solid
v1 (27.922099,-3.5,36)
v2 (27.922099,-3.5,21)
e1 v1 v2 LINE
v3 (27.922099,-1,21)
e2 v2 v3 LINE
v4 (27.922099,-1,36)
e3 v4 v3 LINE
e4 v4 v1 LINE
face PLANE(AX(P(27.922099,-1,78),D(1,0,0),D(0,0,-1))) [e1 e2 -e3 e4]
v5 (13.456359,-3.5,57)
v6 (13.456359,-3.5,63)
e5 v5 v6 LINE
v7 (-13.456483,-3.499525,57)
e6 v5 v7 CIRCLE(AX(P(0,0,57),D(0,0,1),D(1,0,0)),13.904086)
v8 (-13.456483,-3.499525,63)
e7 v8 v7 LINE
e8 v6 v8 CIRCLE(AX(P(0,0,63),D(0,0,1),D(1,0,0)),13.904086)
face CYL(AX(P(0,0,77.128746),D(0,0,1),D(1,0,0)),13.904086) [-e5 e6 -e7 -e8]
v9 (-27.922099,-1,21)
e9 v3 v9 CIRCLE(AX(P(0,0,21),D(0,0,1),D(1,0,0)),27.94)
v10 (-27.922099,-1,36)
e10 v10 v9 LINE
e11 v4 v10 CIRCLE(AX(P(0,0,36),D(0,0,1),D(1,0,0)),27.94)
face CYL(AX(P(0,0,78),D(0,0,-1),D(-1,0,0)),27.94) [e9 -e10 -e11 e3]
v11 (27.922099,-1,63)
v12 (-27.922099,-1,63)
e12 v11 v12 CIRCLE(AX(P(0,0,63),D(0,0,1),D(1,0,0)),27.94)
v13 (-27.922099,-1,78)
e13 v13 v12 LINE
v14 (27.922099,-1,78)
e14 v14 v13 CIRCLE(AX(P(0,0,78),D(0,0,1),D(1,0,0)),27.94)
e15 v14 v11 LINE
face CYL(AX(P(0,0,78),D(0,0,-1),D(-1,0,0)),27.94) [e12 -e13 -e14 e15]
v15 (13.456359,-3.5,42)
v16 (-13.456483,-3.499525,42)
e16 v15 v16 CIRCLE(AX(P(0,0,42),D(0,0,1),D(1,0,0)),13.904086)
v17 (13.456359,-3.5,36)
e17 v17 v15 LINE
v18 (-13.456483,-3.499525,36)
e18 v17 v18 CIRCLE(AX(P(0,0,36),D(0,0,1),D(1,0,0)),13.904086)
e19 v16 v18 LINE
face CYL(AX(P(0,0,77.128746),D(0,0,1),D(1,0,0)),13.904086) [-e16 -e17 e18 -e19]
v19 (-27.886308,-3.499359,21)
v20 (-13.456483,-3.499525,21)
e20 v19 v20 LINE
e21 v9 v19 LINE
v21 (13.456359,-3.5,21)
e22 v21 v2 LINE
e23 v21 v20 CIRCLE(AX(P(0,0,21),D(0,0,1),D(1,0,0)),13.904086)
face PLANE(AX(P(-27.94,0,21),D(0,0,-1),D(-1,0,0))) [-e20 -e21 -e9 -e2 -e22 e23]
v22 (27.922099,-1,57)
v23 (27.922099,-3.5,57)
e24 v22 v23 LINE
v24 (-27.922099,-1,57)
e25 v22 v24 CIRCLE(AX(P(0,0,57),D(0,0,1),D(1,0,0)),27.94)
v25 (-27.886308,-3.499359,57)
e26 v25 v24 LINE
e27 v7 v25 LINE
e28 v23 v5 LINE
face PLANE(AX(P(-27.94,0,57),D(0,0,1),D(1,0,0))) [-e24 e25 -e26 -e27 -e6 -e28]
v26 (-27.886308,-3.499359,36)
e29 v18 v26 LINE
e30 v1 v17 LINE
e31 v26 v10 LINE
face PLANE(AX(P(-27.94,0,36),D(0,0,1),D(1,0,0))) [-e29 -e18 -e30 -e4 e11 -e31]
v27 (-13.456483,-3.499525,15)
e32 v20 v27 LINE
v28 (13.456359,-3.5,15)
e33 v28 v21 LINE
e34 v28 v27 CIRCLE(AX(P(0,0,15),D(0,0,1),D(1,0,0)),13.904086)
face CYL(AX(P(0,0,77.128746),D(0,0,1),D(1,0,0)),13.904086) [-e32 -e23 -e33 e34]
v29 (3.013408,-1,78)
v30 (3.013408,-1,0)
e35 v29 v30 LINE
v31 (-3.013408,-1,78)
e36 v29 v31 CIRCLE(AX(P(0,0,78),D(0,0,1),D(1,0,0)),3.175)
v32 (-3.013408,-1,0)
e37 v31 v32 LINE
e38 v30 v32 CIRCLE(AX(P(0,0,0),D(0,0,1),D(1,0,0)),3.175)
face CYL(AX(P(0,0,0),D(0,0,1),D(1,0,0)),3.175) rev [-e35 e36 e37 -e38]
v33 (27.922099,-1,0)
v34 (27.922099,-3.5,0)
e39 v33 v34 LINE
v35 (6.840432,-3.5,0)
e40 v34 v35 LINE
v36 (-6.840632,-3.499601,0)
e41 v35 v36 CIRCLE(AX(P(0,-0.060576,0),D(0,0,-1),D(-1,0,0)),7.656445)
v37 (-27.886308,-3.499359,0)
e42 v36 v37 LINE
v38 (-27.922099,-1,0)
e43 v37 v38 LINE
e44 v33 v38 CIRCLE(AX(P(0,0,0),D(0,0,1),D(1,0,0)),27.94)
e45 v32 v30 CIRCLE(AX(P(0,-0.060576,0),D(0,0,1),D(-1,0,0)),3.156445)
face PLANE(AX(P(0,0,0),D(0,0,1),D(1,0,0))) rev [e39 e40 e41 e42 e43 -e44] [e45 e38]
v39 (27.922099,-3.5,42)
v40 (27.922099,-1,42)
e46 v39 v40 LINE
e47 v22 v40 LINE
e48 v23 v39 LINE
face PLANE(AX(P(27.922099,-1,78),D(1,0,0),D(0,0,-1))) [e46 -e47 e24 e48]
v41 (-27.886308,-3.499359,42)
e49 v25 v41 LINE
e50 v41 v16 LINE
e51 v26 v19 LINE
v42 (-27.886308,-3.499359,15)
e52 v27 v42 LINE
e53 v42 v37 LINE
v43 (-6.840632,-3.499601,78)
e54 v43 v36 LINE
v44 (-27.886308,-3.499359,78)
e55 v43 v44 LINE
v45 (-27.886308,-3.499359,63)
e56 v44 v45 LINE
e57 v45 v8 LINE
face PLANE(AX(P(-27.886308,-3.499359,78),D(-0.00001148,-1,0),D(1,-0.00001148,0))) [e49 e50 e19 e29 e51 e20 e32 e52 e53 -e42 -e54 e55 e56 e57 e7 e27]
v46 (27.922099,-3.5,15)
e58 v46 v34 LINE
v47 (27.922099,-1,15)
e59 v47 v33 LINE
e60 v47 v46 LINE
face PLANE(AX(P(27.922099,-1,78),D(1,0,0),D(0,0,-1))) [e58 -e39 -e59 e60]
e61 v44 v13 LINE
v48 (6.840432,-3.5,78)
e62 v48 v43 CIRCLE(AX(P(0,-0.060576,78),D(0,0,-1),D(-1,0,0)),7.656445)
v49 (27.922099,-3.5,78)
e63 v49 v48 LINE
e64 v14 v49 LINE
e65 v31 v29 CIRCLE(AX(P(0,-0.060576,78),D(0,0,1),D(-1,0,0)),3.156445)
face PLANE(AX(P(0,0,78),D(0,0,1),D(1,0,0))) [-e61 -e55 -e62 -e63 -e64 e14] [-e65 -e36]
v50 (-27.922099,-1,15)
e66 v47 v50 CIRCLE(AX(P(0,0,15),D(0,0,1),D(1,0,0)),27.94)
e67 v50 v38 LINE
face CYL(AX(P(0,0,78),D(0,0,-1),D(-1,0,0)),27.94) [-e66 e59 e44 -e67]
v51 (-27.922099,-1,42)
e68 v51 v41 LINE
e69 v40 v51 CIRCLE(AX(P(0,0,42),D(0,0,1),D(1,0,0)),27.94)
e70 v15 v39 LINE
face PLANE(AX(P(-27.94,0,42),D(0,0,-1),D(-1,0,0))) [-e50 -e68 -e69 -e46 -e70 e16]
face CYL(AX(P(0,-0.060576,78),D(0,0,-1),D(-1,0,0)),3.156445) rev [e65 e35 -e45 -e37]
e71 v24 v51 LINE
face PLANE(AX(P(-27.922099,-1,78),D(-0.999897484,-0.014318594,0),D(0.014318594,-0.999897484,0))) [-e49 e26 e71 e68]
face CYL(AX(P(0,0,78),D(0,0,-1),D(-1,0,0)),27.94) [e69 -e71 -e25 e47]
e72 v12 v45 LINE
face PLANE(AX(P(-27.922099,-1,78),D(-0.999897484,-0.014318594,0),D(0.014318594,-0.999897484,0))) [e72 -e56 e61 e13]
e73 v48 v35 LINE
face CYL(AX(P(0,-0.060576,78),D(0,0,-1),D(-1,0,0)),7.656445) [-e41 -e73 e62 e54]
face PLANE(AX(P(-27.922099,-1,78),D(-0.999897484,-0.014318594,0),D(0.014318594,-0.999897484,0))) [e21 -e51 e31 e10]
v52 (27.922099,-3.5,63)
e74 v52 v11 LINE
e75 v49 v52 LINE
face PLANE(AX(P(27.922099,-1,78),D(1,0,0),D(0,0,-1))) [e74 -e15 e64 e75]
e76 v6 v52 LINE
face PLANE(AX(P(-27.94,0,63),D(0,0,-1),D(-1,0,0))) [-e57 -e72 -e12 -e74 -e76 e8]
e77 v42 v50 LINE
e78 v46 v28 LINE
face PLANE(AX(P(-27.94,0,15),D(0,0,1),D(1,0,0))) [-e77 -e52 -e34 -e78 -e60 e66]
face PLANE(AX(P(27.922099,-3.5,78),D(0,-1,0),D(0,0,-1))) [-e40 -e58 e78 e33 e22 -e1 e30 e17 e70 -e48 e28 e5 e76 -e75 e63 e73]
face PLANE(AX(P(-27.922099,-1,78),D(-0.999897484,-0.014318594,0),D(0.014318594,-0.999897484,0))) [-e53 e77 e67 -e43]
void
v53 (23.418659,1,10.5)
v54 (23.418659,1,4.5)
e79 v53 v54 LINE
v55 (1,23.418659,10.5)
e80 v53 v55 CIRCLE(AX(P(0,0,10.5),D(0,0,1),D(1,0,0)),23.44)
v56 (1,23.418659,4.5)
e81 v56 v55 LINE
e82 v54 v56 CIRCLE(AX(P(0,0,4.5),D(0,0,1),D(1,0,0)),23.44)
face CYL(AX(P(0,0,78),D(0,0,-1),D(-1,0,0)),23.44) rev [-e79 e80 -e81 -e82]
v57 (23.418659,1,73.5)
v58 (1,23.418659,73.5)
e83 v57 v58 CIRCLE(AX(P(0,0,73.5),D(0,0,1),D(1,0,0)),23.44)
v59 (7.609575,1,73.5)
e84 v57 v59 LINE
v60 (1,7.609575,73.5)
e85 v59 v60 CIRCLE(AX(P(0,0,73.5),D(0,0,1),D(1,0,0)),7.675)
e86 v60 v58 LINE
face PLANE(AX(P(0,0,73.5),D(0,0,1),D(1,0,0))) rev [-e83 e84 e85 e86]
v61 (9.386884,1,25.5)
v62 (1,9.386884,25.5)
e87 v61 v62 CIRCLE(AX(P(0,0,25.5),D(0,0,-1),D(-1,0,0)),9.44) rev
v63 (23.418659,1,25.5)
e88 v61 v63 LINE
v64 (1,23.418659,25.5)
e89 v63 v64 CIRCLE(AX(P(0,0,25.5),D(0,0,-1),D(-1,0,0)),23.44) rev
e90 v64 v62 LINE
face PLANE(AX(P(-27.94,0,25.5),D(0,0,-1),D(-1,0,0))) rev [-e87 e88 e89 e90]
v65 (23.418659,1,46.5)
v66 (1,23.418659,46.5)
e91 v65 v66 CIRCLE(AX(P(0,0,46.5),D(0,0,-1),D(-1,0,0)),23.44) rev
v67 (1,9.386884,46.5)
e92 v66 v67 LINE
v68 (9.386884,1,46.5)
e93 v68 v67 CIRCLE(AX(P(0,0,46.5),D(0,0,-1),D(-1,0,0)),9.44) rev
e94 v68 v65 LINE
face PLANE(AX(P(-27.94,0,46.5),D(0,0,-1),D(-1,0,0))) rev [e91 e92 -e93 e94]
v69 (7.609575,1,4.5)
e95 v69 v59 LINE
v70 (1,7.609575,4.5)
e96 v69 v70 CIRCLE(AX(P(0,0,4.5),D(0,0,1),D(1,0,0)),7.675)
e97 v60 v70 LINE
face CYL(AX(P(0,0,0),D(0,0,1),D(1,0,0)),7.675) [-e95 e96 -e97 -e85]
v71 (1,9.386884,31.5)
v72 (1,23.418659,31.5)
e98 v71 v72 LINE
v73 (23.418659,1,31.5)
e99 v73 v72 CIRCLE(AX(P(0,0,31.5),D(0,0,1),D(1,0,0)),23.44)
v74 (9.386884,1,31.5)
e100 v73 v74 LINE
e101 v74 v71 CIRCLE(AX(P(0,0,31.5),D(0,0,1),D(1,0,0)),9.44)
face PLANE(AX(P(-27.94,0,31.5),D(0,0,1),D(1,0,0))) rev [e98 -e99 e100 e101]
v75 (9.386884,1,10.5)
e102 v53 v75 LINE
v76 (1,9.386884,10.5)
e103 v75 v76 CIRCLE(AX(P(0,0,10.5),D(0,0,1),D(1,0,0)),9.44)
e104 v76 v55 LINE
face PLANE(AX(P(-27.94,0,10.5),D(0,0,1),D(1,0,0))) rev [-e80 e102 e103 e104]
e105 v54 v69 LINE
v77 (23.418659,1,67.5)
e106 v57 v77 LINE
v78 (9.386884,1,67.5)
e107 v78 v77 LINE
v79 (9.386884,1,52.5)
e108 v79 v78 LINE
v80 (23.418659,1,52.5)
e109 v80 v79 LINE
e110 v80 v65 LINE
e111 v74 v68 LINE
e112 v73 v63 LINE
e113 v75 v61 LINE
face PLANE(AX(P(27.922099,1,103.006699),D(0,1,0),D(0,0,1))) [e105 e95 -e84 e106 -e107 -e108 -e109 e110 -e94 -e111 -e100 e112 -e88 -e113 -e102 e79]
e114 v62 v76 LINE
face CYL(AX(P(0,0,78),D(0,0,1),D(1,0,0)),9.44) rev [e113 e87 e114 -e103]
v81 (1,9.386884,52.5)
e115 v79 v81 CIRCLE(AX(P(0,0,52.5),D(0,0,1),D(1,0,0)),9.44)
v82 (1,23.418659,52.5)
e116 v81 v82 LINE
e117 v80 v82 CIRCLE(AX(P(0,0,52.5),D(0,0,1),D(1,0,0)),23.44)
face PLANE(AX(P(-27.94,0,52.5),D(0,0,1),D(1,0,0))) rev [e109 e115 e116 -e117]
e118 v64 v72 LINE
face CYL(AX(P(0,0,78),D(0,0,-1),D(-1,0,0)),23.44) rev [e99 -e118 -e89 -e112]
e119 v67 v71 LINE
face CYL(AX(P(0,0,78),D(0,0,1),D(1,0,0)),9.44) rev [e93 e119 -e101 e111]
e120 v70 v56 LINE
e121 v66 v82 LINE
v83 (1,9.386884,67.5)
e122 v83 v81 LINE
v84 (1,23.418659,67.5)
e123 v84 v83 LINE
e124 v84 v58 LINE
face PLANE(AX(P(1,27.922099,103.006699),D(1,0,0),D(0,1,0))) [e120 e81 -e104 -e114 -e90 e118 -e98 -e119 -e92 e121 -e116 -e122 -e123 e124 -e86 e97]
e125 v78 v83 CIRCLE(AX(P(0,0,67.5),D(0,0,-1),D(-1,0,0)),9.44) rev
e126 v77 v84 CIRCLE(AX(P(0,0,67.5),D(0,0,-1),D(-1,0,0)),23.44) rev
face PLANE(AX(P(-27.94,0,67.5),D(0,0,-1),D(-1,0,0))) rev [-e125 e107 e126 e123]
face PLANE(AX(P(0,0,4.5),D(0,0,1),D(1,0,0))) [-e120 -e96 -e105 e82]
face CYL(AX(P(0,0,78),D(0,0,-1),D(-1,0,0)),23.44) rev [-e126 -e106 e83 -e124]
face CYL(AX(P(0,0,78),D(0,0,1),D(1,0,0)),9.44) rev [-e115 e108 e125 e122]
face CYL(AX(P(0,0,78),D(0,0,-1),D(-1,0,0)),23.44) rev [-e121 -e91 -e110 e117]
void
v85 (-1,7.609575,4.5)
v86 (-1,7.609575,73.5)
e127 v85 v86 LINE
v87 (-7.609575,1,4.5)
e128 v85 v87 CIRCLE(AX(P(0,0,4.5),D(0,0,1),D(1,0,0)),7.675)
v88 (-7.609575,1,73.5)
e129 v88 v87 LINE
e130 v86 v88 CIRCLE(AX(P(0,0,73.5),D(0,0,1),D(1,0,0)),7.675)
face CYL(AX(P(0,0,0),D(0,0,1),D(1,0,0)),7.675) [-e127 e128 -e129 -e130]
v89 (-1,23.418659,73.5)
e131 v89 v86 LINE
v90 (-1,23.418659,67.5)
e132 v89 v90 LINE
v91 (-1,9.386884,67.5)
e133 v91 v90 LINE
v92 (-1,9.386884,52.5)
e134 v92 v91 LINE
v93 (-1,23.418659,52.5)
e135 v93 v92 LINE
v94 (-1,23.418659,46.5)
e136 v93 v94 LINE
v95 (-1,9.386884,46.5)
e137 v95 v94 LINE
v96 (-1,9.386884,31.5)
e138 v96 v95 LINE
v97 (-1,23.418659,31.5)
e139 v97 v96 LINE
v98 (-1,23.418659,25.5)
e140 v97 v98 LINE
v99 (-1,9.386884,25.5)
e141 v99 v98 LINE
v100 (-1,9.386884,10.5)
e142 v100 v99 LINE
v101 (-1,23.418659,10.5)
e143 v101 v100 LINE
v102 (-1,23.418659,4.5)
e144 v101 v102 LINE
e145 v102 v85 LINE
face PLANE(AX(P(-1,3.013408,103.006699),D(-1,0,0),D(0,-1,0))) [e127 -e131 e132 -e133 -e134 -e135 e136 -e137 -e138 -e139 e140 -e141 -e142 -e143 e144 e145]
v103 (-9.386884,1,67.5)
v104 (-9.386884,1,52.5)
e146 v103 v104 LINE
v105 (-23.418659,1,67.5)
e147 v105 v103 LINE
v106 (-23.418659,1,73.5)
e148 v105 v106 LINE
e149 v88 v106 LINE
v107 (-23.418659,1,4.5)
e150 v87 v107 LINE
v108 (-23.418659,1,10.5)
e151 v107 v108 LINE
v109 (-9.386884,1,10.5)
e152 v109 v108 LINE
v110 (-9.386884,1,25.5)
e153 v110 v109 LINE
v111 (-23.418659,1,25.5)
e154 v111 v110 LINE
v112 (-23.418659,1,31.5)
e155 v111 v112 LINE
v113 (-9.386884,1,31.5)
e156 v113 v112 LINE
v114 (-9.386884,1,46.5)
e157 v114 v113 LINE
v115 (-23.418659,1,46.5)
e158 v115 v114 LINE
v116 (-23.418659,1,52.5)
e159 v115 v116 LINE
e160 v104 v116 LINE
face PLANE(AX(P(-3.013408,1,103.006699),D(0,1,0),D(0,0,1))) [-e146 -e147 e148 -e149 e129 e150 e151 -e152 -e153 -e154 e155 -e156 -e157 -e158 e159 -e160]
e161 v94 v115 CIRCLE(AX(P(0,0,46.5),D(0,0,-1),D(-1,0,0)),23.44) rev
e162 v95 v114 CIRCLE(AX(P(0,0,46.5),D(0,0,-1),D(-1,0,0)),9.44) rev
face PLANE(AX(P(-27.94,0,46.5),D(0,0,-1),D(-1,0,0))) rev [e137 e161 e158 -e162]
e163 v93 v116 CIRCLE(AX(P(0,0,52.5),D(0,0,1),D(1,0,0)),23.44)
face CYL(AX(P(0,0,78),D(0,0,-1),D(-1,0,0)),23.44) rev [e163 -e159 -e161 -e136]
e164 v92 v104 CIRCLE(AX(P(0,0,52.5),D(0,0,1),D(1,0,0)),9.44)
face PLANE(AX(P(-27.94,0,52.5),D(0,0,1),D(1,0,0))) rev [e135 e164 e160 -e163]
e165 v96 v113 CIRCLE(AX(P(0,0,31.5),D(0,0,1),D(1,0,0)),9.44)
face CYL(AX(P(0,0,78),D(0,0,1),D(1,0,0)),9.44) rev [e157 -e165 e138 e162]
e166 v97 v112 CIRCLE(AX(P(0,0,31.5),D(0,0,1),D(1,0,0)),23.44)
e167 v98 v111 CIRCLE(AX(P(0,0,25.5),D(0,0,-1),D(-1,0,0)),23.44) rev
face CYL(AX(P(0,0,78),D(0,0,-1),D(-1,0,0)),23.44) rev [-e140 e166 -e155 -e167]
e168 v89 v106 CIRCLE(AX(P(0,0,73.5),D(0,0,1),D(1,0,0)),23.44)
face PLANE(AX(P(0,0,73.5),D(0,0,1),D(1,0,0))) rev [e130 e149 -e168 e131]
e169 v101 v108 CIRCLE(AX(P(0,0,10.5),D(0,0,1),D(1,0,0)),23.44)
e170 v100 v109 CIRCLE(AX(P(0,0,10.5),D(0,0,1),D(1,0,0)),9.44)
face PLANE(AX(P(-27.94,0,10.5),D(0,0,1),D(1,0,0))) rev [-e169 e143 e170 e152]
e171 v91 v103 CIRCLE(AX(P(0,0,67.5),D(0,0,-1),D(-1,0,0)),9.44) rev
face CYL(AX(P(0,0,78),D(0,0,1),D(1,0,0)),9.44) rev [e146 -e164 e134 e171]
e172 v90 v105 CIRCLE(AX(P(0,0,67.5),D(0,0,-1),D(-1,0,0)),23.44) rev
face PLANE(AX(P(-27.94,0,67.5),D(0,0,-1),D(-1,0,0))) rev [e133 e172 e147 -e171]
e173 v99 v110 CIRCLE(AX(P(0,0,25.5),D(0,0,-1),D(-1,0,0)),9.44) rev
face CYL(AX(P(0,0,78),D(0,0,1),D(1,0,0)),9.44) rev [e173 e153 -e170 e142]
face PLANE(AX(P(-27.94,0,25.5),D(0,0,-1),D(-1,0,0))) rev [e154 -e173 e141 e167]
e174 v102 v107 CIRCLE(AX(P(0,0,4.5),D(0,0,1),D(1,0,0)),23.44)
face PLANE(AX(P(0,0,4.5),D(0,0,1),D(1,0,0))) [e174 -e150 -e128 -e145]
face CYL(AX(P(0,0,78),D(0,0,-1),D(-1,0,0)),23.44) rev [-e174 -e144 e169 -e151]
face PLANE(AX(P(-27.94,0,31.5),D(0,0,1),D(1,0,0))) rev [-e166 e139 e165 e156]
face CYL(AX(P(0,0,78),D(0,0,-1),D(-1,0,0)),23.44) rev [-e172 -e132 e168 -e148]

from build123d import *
from build123d.topology import SkipClean

# Parameters (mm, degrees)
SKETCH3_R            = 27.94
BOSS_EXTRUDE2_DEPTH  = 78
SKETCH5_R            = 3.175
CUT_EXTRUDE1_DEPTH   = 88.437332988
SKETCH4_W            = 14
SKETCH4_H            = 6
SHELL1_START         = 4.5
SHELL1_OUTLINE_R     = 23.44
SHELL1_OUTLINE_R_2   = 7.675
SHELL1_DEPTH         = 6
SHELL1_START_2       = 25.5
SHELL1_2_OUTLINE_R   = 23.44
SHELL1_2_OUTLINE_R_2 = 7.675
SHELL1_2_DEPTH       = 6
SHELL1_START_3       = 46.5
SHELL1_3_OUTLINE_R   = 23.44
SHELL1_3_OUTLINE_R_2 = 7.675
SHELL1_3_DEPTH       = 6
SHELL1_START_4       = 67.5
SHELL1_4_OUTLINE_R   = 23.44
SHELL1_4_OUTLINE_R_2 = 7.675
SHELL1_4_DEPTH       = 6
SHELL1_START_5       = 10.5
SHELL1_5_OUTLINE_R   = 9.44
SHELL1_5_OUTLINE_R_2 = 7.675
SHELL1_5_DEPTH       = 57
BOSS_EXTRUDE3_START  = -73.5
BOSS_EXTRUDE3_DEPTH  = 69
CUT_EXTRUDE3_DEPTH   = 78
BOSS_EXTRUDE5_DEPTH  = 78
SKETCH13_W           = 16.483162312
SKETCH13_H           = 6


# Read off the part's stored shape, not the designer's step: Shell1, Boss-Extrude3
with BuildPart() as part:
    # Sketch3 → Boss-Extrude2 (new body)
    with BuildSketch(Plane.XY):
        Circle(SKETCH3_R)
    extrude(amount=BOSS_EXTRUDE2_DEPTH)

    # Sketch5 → Cut-Extrude1 (cut, through all)
    with BuildSketch(Plane.XY.offset(78)):
        Circle(SKETCH5_R)
    extrude(amount=-CUT_EXTRUDE1_DEPTH, mode=Mode.SUBTRACT)

    # Sketch4 → Cut-Revolve1 (revolve, cut)
    with BuildSketch(Plane(origin=(0, 0, 0), x_dir=(1, 0, 0), z_dir=(0, 1, 0)), mode=Mode.PRIVATE) as cut_revolve1_sk:
        with Locations((-20.94, -60)):
            Rectangle(SKETCH4_W, SKETCH4_H)
        with Locations((-20.94, -39)):
            Rectangle(SKETCH4_W, SKETCH4_H)
        with Locations((-20.94, -18)):
            Rectangle(SKETCH4_W, SKETCH4_H)
    revolve(cut_revolve1_sk.sketch.rotate(Axis((0, 0, 78), (0, 0, -1)), 180), axis=Axis((0, 0, 78), (0, 0, -1)), mode=Mode.SUBTRACT)

    # Shell1 outline → Shell1 (cut)
    with BuildSketch(Plane.XY.offset(SHELL1_START)):
        Circle(SHELL1_OUTLINE_R)
        Circle(SHELL1_OUTLINE_R_2, mode=Mode.SUBTRACT)
    extrude(amount=SHELL1_DEPTH, mode=Mode.SUBTRACT)

    # Shell1 2 outline → Shell1 2 (cut)
    with BuildSketch(Plane.XY.offset(SHELL1_START_2)):
        Circle(SHELL1_2_OUTLINE_R)
        Circle(SHELL1_2_OUTLINE_R_2, mode=Mode.SUBTRACT)
    extrude(amount=SHELL1_2_DEPTH, mode=Mode.SUBTRACT)

    # Shell1 3 outline → Shell1 3 (cut)
    with BuildSketch(Plane.XY.offset(SHELL1_START_3)):
        Circle(SHELL1_3_OUTLINE_R)
        Circle(SHELL1_3_OUTLINE_R_2, mode=Mode.SUBTRACT)
    extrude(amount=SHELL1_3_DEPTH, mode=Mode.SUBTRACT)

    # Shell1 4 outline → Shell1 4 (cut)
    with BuildSketch(Plane.XY.offset(SHELL1_START_4)):
        Circle(SHELL1_4_OUTLINE_R)
        Circle(SHELL1_4_OUTLINE_R_2, mode=Mode.SUBTRACT)
    extrude(amount=SHELL1_4_DEPTH, mode=Mode.SUBTRACT)

    # Shell1 5 outline → Shell1 5 (cut)
    with BuildSketch(Plane.XY.offset(SHELL1_START_5)):
        Circle(SHELL1_5_OUTLINE_R)
        Circle(SHELL1_5_OUTLINE_R_2, mode=Mode.SUBTRACT)
    extrude(amount=SHELL1_5_DEPTH, mode=Mode.SUBTRACT)

    # Boss-Extrude3 outline → Boss-Extrude3 (add)
    with SkipClean():  # the faces are left unmerged after this step: merging them gives an invalid solid
        with BuildSketch(Plane(origin=(0, 0, 0), x_dir=(-1, 0, 0), z_dir=(0, 0, -1)).offset(BOSS_EXTRUDE3_START)):
            with BuildLine():
                ThreePointArc((27.922098775, -1), (27.94, 0), (27.922098775, 1))
                Line((27.922098775, 1), (7.609574561, 1))
                ThreePointArc((7.609574561, 1), (7.675, 0), (7.609574561, -1))
                Line((7.609574561, -1), (27.922098775, -1))
            make_face()
            with BuildLine():
                ThreePointArc((1, 27.922098775), (0, 27.94), (-1, 27.922098775))
                Line((-1, 27.922098775), (-1, 7.609574561))
                ThreePointArc((-1, 7.609574561), (0, 7.675), (1, 7.609574561))
                Line((1, 7.609574561), (1, 27.922098775))
            make_face()
            with BuildLine():
                ThreePointArc((-1, -27.922098775), (0, -27.94), (1, -27.922098775))
                Line((1, -27.922098775), (1, -7.609574561))
                ThreePointArc((1, -7.609574561), (0, -7.675), (-1, -7.609574561))
                Line((-1, -7.609574561), (-1, -27.922098775))
            make_face()
            with BuildLine():
                ThreePointArc((-27.922098775, 1), (-27.94, 0), (-27.922098775, -1))
                Line((-27.922098775, -1), (-7.609574561, -1))
                ThreePointArc((-7.609574561, -1), (-7.675, 0), (-7.609574561, 1))
                Line((-7.609574561, 1), (-27.922098775, 1))
            make_face()
        extrude(amount=BOSS_EXTRUDE3_DEPTH)

    # Sketch16 → Cut-Extrude3 (cut)
    with SkipClean():  # the faces are left unmerged after this step: merging them gives an invalid solid
        with BuildSketch(Plane(origin=(0, 0, 0), x_dir=(-1, 0, 0), z_dir=(0, 0, -1))):
            with BuildLine():
                Line((-3.01340754, -1), (-27.922098775, -1))
                ThreePointArc((-27.922098775, -1), (0, -27.94), (27.922098775, -1))
                Line((27.922098775, -1), (3.01340754, -1))
                ThreePointArc((3.01340754, -1), (0, -3.175), (-3.01340754, -1))
            make_face()
        extrude(amount=-CUT_EXTRUDE3_DEPTH, mode=Mode.SUBTRACT)

    # Sketch18 → Boss-Extrude5 (add)
    with SkipClean():  # the faces are left unmerged after this step: merging them gives an invalid solid
        with BuildSketch(Plane(origin=(0, 0, 0), x_dir=(-1, 0, 0), z_dir=(0, 0, -1))):
            with BuildLine():
                Line((-3.01340754, -1), (-27.922098775, -1))
                Line((-27.922098775, -1), (-27.922098775, -3.5))
                Line((-27.922098775, -3.5), (-6.840431771, -3.5))
                ThreePointArc((-6.840431771, -3.5), (0.000223346, -7.717020739), (6.840632422, -3.49960091))
                Line((6.840632422, -3.49960091), (27.886307794, -3.499359298))
                Line((27.886307794, -3.499359298), (27.922098775, -1))
                Line((27.922098775, -1), (3.01340754, -1))
                ThreePointArc((3.01340754, -1), (0, -3.217020742), (-3.01340754, -1))
            make_face()
        extrude(amount=-BOSS_EXTRUDE5_DEPTH)

    # Sketch13 → Cut-Revolve2 (revolve, cut)
    with BuildSketch(Plane(origin=(0, 0, 0), x_dir=(1, 0, 0), z_dir=(0, 1, 0))):
        with Locations((-22.145666886, -39)):
            Rectangle(SKETCH13_W, SKETCH13_H)
        with Locations((-22.145666886, -18)):
            Rectangle(SKETCH13_W, SKETCH13_H)
        with Locations((-22.145666886, -60)):
            Rectangle(SKETCH13_W, SKETCH13_H)
    revolve(axis=Axis((0, 0, 77.128746248), (0, 0, -1)), mode=Mode.SUBTRACT)


solid = part.part
